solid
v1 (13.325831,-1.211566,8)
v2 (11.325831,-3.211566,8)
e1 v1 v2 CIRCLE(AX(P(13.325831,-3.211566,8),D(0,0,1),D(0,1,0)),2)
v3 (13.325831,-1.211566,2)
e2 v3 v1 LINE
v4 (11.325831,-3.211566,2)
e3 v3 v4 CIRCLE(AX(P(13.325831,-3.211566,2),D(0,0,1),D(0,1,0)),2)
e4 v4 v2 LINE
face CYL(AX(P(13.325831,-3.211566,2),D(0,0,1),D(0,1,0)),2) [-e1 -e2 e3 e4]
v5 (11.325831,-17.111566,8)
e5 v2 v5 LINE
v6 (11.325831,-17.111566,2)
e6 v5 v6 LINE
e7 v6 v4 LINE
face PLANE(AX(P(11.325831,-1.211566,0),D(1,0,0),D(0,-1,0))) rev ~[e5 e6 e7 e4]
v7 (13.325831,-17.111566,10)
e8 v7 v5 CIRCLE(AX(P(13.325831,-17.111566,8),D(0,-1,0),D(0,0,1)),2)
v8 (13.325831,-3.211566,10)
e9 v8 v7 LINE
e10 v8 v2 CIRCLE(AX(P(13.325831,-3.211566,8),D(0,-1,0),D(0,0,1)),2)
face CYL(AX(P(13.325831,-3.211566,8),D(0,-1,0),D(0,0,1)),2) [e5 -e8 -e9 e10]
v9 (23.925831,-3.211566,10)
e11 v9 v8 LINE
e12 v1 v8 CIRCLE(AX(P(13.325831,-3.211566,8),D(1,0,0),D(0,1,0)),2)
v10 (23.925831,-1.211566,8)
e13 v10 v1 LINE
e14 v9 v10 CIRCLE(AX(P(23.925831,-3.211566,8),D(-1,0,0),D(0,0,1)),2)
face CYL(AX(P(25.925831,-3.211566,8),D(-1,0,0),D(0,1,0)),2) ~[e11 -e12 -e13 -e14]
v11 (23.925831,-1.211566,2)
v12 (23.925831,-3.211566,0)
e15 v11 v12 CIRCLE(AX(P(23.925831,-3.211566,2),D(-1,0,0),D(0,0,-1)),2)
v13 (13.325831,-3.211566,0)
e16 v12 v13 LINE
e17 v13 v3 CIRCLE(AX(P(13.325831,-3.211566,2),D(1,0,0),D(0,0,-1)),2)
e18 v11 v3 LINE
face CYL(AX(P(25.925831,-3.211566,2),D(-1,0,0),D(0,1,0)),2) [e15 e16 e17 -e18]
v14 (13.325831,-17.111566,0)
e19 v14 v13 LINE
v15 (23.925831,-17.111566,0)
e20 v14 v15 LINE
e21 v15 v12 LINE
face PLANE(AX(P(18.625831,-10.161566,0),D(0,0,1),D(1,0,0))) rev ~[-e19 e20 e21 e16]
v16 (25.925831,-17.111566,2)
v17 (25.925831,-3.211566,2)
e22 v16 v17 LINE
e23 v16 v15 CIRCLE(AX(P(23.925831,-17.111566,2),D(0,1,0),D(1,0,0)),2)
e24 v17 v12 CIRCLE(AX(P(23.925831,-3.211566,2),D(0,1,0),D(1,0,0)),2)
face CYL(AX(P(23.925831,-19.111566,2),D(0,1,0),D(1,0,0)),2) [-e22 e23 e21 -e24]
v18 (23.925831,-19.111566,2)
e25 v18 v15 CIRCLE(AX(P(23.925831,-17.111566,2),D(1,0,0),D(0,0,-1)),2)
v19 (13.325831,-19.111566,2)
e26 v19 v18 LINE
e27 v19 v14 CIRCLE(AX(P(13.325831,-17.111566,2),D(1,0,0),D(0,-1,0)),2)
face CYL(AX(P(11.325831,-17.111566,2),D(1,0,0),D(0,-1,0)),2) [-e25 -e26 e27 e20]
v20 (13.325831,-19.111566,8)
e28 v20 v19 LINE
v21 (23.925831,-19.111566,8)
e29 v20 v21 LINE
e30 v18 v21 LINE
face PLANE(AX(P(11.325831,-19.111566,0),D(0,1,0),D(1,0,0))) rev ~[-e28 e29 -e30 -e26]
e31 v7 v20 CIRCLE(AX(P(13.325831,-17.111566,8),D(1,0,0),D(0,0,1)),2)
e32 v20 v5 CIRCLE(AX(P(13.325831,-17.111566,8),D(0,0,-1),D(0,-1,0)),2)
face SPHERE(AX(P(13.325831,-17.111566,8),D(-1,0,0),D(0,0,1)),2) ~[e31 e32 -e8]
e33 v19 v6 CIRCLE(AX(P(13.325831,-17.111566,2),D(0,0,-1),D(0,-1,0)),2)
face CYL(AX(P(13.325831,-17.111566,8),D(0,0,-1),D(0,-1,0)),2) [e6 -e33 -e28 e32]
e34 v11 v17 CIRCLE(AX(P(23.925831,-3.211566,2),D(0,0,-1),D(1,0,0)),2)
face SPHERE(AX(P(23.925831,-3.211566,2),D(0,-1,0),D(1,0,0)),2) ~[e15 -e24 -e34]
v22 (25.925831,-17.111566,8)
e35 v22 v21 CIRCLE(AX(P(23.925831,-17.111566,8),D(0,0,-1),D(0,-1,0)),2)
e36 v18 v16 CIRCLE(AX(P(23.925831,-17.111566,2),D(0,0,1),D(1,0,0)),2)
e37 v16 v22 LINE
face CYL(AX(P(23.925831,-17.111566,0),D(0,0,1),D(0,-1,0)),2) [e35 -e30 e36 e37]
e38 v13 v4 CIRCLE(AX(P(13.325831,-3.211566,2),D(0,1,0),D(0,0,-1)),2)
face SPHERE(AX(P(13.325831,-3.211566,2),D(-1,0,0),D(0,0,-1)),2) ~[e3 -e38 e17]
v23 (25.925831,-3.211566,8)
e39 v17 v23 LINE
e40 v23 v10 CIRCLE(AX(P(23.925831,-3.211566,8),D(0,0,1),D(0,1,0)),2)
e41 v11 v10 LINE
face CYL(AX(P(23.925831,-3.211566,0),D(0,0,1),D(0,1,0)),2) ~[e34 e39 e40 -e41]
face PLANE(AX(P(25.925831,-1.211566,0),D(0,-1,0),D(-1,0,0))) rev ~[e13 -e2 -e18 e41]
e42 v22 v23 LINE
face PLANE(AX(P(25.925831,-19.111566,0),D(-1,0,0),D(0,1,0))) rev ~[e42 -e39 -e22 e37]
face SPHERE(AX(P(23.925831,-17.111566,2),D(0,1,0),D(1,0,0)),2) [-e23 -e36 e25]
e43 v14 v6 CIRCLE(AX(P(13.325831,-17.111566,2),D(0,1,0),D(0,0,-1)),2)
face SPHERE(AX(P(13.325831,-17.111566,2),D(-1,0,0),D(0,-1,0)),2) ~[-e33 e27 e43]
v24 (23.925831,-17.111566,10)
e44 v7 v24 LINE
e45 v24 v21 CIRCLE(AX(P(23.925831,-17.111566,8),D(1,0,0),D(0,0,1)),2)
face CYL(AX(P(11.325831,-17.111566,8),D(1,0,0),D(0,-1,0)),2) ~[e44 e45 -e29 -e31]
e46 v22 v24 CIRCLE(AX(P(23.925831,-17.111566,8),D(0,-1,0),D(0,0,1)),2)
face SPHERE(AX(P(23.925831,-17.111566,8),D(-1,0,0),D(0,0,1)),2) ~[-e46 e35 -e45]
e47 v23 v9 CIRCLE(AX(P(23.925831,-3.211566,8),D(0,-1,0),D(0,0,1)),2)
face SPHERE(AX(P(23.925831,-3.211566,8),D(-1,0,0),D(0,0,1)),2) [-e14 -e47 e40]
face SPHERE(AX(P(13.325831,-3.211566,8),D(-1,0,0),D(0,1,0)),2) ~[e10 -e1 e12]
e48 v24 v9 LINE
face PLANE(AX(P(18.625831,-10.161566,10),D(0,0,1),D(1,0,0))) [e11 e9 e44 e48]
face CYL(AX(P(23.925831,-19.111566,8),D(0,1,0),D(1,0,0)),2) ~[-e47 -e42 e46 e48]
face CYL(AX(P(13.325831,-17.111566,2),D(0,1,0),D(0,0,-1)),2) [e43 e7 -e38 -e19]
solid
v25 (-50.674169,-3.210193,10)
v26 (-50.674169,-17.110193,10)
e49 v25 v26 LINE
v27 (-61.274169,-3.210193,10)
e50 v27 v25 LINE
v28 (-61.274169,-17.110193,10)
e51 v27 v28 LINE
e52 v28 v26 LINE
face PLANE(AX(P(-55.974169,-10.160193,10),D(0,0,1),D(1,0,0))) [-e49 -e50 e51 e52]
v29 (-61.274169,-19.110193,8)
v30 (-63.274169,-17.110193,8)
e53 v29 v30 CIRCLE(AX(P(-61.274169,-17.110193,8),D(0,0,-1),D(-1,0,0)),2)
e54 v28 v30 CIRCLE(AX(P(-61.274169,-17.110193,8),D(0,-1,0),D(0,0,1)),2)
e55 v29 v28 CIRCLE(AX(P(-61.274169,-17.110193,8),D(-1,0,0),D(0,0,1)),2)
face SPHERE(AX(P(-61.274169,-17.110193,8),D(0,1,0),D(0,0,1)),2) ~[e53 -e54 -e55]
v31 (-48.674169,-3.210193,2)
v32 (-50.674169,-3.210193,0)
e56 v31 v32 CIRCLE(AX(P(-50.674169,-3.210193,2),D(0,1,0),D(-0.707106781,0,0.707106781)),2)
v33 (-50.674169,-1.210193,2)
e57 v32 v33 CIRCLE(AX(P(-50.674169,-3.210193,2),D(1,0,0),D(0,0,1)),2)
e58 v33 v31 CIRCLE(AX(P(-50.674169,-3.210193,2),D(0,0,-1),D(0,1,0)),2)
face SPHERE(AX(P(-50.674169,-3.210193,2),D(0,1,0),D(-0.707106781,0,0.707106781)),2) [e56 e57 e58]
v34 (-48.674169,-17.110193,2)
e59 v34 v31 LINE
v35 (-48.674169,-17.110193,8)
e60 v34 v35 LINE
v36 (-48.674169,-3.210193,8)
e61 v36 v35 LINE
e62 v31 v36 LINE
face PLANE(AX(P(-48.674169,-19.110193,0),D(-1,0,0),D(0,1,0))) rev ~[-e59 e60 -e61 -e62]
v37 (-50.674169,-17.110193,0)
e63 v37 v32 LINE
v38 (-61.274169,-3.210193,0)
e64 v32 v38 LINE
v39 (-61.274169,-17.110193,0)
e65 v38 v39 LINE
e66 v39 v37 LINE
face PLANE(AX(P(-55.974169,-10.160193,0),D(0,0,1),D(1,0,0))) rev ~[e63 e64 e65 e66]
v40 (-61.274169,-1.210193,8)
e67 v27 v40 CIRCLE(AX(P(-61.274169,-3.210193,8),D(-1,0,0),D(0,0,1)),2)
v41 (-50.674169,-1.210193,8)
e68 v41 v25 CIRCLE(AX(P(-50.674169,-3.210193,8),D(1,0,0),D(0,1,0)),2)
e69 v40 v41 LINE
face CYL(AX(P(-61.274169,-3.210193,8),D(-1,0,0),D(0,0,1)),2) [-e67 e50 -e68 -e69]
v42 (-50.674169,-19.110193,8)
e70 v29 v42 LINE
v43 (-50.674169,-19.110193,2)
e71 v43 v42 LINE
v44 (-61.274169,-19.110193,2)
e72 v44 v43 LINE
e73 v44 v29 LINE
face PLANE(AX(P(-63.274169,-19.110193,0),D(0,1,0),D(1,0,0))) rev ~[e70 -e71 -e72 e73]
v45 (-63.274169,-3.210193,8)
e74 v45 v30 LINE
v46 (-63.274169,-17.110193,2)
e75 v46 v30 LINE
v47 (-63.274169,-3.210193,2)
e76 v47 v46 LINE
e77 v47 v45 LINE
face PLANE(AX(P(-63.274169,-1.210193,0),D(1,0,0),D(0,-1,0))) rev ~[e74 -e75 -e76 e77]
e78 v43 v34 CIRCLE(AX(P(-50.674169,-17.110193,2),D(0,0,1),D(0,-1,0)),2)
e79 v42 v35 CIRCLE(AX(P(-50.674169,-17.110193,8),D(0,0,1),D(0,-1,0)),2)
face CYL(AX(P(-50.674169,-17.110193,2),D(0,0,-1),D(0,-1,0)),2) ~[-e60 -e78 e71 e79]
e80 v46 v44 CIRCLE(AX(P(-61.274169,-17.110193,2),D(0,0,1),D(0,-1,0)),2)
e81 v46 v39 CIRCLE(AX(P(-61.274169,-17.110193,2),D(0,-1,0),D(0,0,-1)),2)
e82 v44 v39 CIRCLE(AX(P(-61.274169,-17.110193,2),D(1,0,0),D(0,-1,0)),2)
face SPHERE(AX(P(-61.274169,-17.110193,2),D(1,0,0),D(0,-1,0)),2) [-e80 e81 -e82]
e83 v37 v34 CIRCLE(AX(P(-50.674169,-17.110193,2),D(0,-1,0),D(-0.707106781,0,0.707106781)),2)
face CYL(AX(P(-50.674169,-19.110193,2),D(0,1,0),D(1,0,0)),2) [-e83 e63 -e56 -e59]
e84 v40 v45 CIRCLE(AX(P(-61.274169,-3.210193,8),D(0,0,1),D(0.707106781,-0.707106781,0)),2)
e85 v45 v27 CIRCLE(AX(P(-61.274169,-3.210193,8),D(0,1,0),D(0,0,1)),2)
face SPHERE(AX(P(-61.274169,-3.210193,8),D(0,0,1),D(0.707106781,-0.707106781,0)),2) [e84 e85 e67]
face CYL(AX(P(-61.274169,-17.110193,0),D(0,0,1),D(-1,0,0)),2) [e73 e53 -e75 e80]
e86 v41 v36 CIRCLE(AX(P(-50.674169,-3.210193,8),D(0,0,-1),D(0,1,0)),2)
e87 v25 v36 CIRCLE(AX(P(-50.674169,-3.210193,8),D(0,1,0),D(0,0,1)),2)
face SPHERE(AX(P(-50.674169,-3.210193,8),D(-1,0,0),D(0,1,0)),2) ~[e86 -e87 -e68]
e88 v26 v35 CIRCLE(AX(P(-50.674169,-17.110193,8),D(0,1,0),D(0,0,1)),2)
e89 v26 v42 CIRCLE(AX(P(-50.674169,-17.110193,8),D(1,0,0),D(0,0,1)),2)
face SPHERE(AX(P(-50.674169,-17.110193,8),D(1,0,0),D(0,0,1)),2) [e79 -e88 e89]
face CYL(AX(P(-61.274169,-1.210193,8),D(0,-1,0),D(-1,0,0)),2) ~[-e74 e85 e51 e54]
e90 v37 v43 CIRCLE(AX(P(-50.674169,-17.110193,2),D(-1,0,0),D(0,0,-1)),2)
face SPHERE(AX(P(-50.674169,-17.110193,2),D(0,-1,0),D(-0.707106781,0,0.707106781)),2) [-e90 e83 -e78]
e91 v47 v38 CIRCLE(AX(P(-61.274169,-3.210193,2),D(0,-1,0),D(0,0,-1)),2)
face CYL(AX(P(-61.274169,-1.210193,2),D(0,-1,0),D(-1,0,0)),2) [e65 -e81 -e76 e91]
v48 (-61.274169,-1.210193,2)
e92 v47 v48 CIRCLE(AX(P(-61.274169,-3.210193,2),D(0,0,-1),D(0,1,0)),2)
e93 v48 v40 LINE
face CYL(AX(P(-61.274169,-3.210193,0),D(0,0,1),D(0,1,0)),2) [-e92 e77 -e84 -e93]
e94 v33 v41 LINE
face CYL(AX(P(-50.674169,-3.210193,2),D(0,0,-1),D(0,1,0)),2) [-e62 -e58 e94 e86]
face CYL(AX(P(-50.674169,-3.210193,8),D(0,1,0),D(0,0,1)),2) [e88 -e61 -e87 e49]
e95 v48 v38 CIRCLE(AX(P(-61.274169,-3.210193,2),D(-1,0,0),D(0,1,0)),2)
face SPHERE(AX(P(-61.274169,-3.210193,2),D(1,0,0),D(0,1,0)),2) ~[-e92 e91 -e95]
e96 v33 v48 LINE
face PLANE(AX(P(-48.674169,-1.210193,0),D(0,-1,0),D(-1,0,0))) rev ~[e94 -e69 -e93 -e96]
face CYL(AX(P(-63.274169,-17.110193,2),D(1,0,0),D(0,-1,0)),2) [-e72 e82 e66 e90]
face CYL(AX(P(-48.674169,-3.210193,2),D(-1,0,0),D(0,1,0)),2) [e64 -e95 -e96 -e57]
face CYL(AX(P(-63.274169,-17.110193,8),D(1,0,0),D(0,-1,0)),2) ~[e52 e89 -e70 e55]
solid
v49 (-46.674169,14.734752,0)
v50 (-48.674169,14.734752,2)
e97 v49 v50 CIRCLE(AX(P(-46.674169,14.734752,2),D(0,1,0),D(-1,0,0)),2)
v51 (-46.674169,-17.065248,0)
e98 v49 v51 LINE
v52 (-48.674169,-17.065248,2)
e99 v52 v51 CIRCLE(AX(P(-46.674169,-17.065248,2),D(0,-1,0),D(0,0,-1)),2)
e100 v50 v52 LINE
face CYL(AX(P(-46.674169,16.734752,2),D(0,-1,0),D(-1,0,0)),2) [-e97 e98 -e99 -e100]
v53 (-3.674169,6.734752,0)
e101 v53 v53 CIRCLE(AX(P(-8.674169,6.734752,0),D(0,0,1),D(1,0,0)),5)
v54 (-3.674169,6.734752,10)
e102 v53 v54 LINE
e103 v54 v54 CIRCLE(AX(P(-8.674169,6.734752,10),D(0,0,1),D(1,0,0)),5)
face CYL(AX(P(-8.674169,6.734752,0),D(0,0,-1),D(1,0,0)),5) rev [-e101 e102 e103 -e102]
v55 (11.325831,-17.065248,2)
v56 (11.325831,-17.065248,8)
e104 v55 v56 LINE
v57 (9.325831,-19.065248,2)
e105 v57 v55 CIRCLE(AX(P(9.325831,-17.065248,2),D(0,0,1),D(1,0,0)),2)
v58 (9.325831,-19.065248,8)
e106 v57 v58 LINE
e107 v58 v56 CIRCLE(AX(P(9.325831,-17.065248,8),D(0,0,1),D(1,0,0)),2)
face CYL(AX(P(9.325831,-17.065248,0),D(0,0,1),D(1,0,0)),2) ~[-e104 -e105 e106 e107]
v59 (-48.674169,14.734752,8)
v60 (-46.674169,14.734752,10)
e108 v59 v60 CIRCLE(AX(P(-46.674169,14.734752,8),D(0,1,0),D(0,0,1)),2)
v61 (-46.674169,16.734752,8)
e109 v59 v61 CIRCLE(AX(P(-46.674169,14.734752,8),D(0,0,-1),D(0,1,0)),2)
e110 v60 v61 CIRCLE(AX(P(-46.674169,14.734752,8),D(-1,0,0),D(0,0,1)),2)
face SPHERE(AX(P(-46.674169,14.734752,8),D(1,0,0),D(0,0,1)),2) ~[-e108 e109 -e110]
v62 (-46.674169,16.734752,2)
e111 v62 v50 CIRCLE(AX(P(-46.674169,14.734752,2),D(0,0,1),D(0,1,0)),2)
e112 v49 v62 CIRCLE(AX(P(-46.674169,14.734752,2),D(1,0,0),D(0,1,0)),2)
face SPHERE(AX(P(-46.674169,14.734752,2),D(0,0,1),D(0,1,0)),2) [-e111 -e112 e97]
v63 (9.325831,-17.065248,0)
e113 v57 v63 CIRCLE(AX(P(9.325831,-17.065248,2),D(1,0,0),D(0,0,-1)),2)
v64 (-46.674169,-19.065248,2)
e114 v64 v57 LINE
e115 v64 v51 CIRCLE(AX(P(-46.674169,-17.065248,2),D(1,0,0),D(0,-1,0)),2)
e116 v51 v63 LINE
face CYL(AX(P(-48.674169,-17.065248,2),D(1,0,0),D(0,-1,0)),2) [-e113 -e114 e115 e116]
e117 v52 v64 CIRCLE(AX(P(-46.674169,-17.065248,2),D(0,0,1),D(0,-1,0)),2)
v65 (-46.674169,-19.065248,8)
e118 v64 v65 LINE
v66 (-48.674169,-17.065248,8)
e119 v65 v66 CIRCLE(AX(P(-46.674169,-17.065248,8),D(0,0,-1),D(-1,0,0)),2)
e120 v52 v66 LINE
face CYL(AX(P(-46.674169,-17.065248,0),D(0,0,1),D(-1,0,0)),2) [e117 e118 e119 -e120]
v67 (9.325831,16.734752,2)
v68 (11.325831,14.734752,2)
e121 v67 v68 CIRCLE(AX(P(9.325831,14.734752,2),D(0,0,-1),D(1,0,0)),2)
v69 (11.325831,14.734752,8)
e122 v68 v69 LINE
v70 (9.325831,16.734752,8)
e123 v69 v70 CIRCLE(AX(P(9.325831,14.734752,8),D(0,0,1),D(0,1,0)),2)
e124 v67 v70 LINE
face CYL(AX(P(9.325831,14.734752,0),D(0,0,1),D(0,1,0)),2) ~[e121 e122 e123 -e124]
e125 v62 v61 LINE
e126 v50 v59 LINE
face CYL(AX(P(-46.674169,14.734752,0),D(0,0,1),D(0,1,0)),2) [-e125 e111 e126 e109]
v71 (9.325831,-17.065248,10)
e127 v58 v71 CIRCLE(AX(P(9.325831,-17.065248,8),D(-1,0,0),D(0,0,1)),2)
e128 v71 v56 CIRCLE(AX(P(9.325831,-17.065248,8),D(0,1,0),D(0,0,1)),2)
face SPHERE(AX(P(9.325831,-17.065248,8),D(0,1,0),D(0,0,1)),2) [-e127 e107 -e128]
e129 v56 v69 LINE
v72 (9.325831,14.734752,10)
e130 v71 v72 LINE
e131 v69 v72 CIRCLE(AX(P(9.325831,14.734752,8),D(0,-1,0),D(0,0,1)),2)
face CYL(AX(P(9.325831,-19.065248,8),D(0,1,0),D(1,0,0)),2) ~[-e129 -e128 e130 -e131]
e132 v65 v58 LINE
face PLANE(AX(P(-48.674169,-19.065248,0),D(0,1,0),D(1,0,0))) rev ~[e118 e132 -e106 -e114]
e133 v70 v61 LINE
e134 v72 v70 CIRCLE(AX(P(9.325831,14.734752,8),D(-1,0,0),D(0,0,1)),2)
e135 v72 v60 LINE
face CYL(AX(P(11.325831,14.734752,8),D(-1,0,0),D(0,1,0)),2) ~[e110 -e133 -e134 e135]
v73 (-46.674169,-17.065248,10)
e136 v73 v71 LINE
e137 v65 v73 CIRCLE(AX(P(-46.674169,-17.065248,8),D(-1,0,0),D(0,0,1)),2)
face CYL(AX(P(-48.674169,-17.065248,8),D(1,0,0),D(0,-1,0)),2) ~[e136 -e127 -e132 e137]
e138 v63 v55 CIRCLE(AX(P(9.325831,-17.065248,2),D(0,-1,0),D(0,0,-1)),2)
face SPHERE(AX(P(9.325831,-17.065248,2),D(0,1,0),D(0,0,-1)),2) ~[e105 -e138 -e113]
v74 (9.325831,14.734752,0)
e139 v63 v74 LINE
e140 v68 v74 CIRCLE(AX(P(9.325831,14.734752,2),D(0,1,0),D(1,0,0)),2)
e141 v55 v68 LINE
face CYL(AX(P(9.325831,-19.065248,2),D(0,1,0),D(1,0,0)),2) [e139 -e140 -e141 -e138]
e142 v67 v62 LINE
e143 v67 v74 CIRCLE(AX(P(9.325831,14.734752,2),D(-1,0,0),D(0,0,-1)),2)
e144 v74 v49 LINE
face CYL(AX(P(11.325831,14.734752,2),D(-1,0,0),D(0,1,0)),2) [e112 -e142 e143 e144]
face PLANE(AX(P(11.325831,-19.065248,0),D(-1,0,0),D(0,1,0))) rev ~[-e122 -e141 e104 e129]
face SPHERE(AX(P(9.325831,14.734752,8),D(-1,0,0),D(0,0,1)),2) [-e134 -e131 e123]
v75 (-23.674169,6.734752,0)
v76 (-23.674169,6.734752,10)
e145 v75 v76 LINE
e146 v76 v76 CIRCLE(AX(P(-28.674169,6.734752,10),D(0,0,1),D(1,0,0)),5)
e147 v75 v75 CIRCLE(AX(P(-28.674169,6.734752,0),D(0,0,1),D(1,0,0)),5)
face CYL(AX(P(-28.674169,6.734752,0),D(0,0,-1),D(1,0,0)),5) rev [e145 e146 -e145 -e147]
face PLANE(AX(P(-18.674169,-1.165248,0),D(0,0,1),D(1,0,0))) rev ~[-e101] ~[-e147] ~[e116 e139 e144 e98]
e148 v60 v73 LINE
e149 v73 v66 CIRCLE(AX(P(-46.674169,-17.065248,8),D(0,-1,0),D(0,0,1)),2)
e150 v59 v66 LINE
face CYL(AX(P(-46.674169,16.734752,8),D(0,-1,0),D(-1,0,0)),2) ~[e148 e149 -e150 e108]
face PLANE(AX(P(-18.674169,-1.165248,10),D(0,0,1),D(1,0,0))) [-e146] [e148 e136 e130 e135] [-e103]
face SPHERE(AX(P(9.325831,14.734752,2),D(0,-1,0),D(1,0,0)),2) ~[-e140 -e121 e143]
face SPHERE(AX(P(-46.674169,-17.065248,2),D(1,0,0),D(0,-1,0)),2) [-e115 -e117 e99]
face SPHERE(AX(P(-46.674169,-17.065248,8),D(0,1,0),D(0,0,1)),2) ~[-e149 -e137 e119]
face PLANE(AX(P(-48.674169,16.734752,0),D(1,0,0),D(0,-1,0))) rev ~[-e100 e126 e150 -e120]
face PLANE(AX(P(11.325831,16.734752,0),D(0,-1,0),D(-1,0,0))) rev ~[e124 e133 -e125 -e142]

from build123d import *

# Parameters (mm, degrees)
F1_DEPTH     = 10
F0_R         = 5
F2_DEPTH     = 10
F3_R         = 2
F3_2_R       = 2
F3_3_R       = 2
F4_T1_DEPTH  = 17.6
F4_S5_W      = 2.04
F4_S5_H      = 2.04
F4_T6_DEPTH  = 2.04
F4_T9_DEPTH  = 6
F4_T11_DEPTH = 13.9
F4_S15_W     = 2.04
F4_S15_H     = 2.04
F4_T16_DEPTH = 2.04
F4_S21_W     = 2.04
F4_S21_H     = 2.04
F4_T22_DEPTH = 2.04
F4_T26_ANGLE = 90
F4_T28_ANGLE = 90
F4_2_F1_R    = 2


# Not quite as in the source:
# - a fillet or chamfer that OpenCascade refuses, or shapes differently, is made with other operations: its cross-section is extruded or revolved along the edge and cut away or added
# - a feature of the source that left no trace in its solid (it failed there, or was rolled back) is left out


with BuildPart() as f1:
    # F0 (on Top) → F1 (new body)
    with BuildSketch(Plane.XY):
        Polygon((-48.6741693407, -19.0652475223), (-48.6741693407, -1.2101934761), (-63.2741693407, -1.2101934761), (-63.2741693407, -19.1101934761), (-48.6741693407, -19.1101934761), align=None)
    extrude(amount=F1_DEPTH)

    # F3
    f3_edges = [f1.edges().sort_by_distance(p)[0] for p in [
        (-63.274169, -10.160193, 10),
        (-55.974169, -19.110193, 10),
        (-55.974169, -1.210193, 0),
        (-48.674169, -10.160193, 0),
        (-55.974169, -19.110193, 0),
        (-63.274169, -19.110193, 5),
        (-63.274169, -1.210193, 5),
        (-63.274169, -10.160193, 0),
    ]]
    fillet(f3_edges, radius=F3_R)

    # F4: fillet of radius 2 on 2 edges, made by hand

    # F4_s2 → F4_t1 (cut)
    with BuildSketch(Plane.YZ.offset(-61.2741693407)):
        with BuildLine():
            ThreePointArc((-3.2101934761, 10), (-1.7959799137, 9.4142135624), (-1.2101934761, 8))
            Line((-1.2101934761, 8), (-1.1701934761, 8))
            Line((-1.1701934761, 8), (-1.1701934761, 10.04))
            Line((-1.1701934761, 10.04), (-3.2101934761, 10.04))
            Line((-3.2101934761, 10.04), (-3.2101934761, 10))
        make_face()
    extrude(amount=F4_T1_DEPTH, mode=Mode.SUBTRACT)


with BuildPart() as f1b:
    # F0 (on Top) → F1, piece 2 (new body)
    with BuildSketch(Plane.XY):
        Polygon((25.9258306593, -1.2115662456), (11.3258306593, -1.2115662456), (11.3258306593, -19.0652475223), (11.3258306593, -19.1115662456), (25.9258306593, -19.1115662456), align=None)
    extrude(amount=F1_DEPTH)

    # F3#2
    f3_2_edges = [f1b.edges().sort_by_distance(p)[0] for p in [
        (18.625831, -19.111566, 10),
        (18.625831, -1.211566, 10),
        (25.925831, -10.161566, 10),
        (25.925831, -10.161566, 0),
        (25.925831, -1.211566, 5),
        (18.625831, -1.211566, 0),
        (25.925831, -19.111566, 5),
        (18.625831, -19.111566, 0),
    ]]
    fillet(f3_2_edges, radius=F3_2_R)

    # F4#2: fillet of radius 2 on 2 edges, made by hand

    # F4_2_f1
    f4_2_f1_edges = [f1b.edges().sort_by_distance(p)[0] for p in [
        (11.3258306593, -1.2115662456, 5),
        (11.3258306593, -1.7973526832, 0.5857864376),
        (11.3258306593, -1.7973526832, 9.4142135624),
        (11.3258306593, -10.1615662456, 0),
        (11.3258306593, -10.1615662456, 10),
        (11.3258306593, -18.5257798079, 0.5857864376),
        (11.3258306593, -18.5257798079, 9.4142135624),
        (11.3258306593, -19.1115662456, 5),
    ]]
    fillet(f4_2_f1_edges, radius=F4_2_F1_R)


with BuildPart() as f2:
    # F0 (on Top) → F2 (new body)
    with BuildSketch(Plane.XY):
        Polygon((11.3258306593, 16.7347524777), (-48.6741693407, 16.7347524777), (-48.6741693407, -1.2101934761), (-48.6741693407, -19.0652475223), (11.3258306593, -19.0652475223), (11.3258306593, -1.2115662456), align=None)
        with Locations((-28.6741693407, 6.7347524777)):
            Circle(F0_R, mode=Mode.SUBTRACT)
        with Locations((-8.6741693407, 6.7347524777)):
            Circle(F0_R, mode=Mode.SUBTRACT)
    extrude(amount=F2_DEPTH)

    # F3#3
    f3_3_edges = [f2.edges().sort_by_distance(p)[0] for p in [
        (11.325831, -10.161566, 0),
        (-18.674169, 16.734752, 10),
        (11.325831, -1.165248, 10),
        (-48.674169, -1.165248, 10),
        (-18.674169, -19.065248, 10),
        (11.325831, 16.734752, 5),
        (-48.674169, 16.734752, 5),
        (-18.674169, -19.065248, 0),
        (-18.674169, 16.734752, 0),
        (-48.674169, -19.065248, 5),
        (-48.674169, -1.165248, 0),
        (11.325831, -19.065248, 5),
        (11.325831, -1.165248, 0),
    ]]
    fillet(f3_3_edges, radius=F3_3_R)


with BuildPart() as f4_tool4:
    # F4_s5 → F4_t6 (new body)
    with BuildSketch(Plane.XY.offset(8)):
        with Locations((-62.2941693407, -2.1901934761)):
            Rectangle(F4_S5_W, F4_S5_H)
    extrude(amount=F4_T6_DEPTH)

    # F4_s7 → F4_t8 (revolve, cut)
    with BuildSketch(Plane(origin=(-61.2741693407, -3.2101934761, 8), x_dir=(0.7071067812, -0.7071067812, 0), z_dir=(-0.7071067812, -0.7071067812, 0))):
        with BuildLine():
            ThreePointArc((0, -2), (2, 0), (0, 2))
            Line((0, 2), (0, -2))
        make_face()
    revolve(axis=Axis((-61.2741693407, -3.2101934761, 8), (0, 0, 1)), mode=Mode.SUBTRACT)


with BuildPart() as f1_1:
    add(f1.part)

    # F4_t3: cut F4_tool4
    add(f4_tool4.part, mode=Mode.SUBTRACT)

    # F4_s10 → F4_t9 (cut)
    with BuildSketch(Plane.XY.offset(2)):
        with BuildLine():
            ThreePointArc((-50.6741693407, -1.2101934761), (-49.2599557784, -1.7959799137), (-48.6741693407, -3.2101934761))
            Line((-48.6741693407, -3.2101934761), (-48.6341693407, -3.2101934761))
            Line((-48.6341693407, -3.2101934761), (-48.6341693407, -1.1701934761))
            Line((-48.6341693407, -1.1701934761), (-50.6741693407, -1.1701934761))
            Line((-50.6741693407, -1.1701934761), (-50.6741693407, -1.2101934761))
        make_face()
        with BuildLine():
            ThreePointArc((-50.6741693407, -19.1101934761), (-49.2599557784, -18.5244070385), (-48.6741693407, -17.1101934761))
            Line((-48.6741693407, -17.1101934761), (-48.6341693407, -17.1101934761))
            Line((-48.6341693407, -17.1101934761), (-48.6341693407, -19.1501934761))
            Line((-48.6341693407, -19.1501934761), (-50.6741693407, -19.1501934761))
            Line((-50.6741693407, -19.1501934761), (-50.6741693407, -19.1101934761))
        make_face()
    extrude(amount=F4_T9_DEPTH, mode=Mode.SUBTRACT)

    # F4_s12 → F4_t11 (cut)
    with BuildSketch(Plane.XZ.offset(3.2101934761)):
        with BuildLine():
            ThreePointArc((-50.6741693407, 10), (-49.2599557784, 9.4142135624), (-48.6741693407, 8))
            Line((-48.6741693407, 8), (-48.6341693407, 8))
            Line((-48.6341693407, 8), (-48.6341693407, 10.04))
            Line((-48.6341693407, 10.04), (-50.6741693407, 10.04))
            Line((-50.6741693407, 10.04), (-50.6741693407, 10))
        make_face()
    extrude(amount=F4_T11_DEPTH, mode=Mode.SUBTRACT)


with BuildPart() as f4_tool14:
    # F4_s15 → F4_t16 (new body)
    with BuildSketch(Plane.XZ.offset(3.2101934761)):
        with Locations((-49.6541693407, 0.98)):
            Rectangle(F4_S15_W, F4_S15_H)
    extrude(amount=-F4_T16_DEPTH)

    # F4_s17 → F4_t18 (revolve, cut)
    with BuildSketch(Plane(origin=(-50.6741693407, -3.2101934761, 2), x_dir=(-0.7071067812, 0, 0.7071067812), z_dir=(-0.7071067812, 0, -0.7071067812))):
        with BuildLine():
            ThreePointArc((0, -2), (2, 0), (0, 2))
            Line((0, 2), (0, -2))
        make_face()
    revolve(axis=Axis((-50.6741693407, -3.2101934761, 2), (0, 1, 0)), mode=Mode.SUBTRACT)


with BuildPart() as f1_2:
    add(f1_1.part)

    # F4_t13: cut F4_tool14
    add(f4_tool14.part, mode=Mode.SUBTRACT)


with BuildPart() as f4_tool20:
    # F4_s21 → F4_t22 (new body)
    with BuildSketch(Plane.XZ.offset(17.1101934761)):
        with Locations((-49.6541693407, 0.98)):
            Rectangle(F4_S21_W, F4_S21_H)
    extrude(amount=F4_T22_DEPTH)

    # F4_s23 → F4_t24 (revolve, cut)
    with BuildSketch(Plane(origin=(-50.6741693407, -17.1101934761, 2), x_dir=(-0.7071067812, 0, 0.7071067812), z_dir=(0.7071067812, 0, 0.7071067812))):
        with BuildLine():
            ThreePointArc((0, -2), (2, 0), (0, 2))
            Line((0, 2), (0, -2))
        make_face()
    revolve(axis=Axis((-50.6741693407, -17.1101934761, 2), (0, -1, 0)), mode=Mode.SUBTRACT)


with BuildPart() as f1_3:
    add(f1_2.part)

    # F4_t19: cut F4_tool20
    add(f4_tool20.part, mode=Mode.SUBTRACT)

    # F4_s25 → F4_t26 (revolve, cut)
    with BuildSketch(Plane.XY.offset(8)):
        with BuildLine():
            ThreePointArc((-48.6741693407, -3.2101934761), (-49.2599557784, -1.7959799137), (-50.6741693407, -1.2101934761))
            Line((-50.6741693407, -1.2101934761), (-50.6741693407, -1.1701934761))
            Line((-50.6741693407, -1.1701934761), (-48.6341693407, -1.1701934761))
            Line((-48.6341693407, -1.1701934761), (-48.6341693407, -3.2101934761))
            Line((-48.6341693407, -3.2101934761), (-48.6741693407, -3.2101934761))
        make_face()
    revolve(axis=Axis((-48.6741693407, -3.2101934761, 8), (1, 0, 0)), revolution_arc=F4_T26_ANGLE, mode=Mode.SUBTRACT)

    # F4_s27 → F4_t28 (revolve, cut)
    with BuildSketch(Plane.XZ.offset(17.1101934761)):
        with BuildLine():
            ThreePointArc((-50.6741693407, 10), (-49.2599557784, 9.4142135624), (-48.6741693407, 8))
            Line((-48.6741693407, 8), (-48.6341693407, 8))
            Line((-48.6341693407, 8), (-48.6341693407, 10.04))
            Line((-48.6341693407, 10.04), (-50.6741693407, 10.04))
            Line((-50.6741693407, 10.04), (-50.6741693407, 10))
        make_face()
    revolve(axis=Axis((-48.6741693407, -17.1101934761, 8), (1, 0, 0)), revolution_arc=F4_T28_ANGLE, mode=Mode.SUBTRACT)


solid = Compound([f1b.part, f2.part, f1_3.part])
